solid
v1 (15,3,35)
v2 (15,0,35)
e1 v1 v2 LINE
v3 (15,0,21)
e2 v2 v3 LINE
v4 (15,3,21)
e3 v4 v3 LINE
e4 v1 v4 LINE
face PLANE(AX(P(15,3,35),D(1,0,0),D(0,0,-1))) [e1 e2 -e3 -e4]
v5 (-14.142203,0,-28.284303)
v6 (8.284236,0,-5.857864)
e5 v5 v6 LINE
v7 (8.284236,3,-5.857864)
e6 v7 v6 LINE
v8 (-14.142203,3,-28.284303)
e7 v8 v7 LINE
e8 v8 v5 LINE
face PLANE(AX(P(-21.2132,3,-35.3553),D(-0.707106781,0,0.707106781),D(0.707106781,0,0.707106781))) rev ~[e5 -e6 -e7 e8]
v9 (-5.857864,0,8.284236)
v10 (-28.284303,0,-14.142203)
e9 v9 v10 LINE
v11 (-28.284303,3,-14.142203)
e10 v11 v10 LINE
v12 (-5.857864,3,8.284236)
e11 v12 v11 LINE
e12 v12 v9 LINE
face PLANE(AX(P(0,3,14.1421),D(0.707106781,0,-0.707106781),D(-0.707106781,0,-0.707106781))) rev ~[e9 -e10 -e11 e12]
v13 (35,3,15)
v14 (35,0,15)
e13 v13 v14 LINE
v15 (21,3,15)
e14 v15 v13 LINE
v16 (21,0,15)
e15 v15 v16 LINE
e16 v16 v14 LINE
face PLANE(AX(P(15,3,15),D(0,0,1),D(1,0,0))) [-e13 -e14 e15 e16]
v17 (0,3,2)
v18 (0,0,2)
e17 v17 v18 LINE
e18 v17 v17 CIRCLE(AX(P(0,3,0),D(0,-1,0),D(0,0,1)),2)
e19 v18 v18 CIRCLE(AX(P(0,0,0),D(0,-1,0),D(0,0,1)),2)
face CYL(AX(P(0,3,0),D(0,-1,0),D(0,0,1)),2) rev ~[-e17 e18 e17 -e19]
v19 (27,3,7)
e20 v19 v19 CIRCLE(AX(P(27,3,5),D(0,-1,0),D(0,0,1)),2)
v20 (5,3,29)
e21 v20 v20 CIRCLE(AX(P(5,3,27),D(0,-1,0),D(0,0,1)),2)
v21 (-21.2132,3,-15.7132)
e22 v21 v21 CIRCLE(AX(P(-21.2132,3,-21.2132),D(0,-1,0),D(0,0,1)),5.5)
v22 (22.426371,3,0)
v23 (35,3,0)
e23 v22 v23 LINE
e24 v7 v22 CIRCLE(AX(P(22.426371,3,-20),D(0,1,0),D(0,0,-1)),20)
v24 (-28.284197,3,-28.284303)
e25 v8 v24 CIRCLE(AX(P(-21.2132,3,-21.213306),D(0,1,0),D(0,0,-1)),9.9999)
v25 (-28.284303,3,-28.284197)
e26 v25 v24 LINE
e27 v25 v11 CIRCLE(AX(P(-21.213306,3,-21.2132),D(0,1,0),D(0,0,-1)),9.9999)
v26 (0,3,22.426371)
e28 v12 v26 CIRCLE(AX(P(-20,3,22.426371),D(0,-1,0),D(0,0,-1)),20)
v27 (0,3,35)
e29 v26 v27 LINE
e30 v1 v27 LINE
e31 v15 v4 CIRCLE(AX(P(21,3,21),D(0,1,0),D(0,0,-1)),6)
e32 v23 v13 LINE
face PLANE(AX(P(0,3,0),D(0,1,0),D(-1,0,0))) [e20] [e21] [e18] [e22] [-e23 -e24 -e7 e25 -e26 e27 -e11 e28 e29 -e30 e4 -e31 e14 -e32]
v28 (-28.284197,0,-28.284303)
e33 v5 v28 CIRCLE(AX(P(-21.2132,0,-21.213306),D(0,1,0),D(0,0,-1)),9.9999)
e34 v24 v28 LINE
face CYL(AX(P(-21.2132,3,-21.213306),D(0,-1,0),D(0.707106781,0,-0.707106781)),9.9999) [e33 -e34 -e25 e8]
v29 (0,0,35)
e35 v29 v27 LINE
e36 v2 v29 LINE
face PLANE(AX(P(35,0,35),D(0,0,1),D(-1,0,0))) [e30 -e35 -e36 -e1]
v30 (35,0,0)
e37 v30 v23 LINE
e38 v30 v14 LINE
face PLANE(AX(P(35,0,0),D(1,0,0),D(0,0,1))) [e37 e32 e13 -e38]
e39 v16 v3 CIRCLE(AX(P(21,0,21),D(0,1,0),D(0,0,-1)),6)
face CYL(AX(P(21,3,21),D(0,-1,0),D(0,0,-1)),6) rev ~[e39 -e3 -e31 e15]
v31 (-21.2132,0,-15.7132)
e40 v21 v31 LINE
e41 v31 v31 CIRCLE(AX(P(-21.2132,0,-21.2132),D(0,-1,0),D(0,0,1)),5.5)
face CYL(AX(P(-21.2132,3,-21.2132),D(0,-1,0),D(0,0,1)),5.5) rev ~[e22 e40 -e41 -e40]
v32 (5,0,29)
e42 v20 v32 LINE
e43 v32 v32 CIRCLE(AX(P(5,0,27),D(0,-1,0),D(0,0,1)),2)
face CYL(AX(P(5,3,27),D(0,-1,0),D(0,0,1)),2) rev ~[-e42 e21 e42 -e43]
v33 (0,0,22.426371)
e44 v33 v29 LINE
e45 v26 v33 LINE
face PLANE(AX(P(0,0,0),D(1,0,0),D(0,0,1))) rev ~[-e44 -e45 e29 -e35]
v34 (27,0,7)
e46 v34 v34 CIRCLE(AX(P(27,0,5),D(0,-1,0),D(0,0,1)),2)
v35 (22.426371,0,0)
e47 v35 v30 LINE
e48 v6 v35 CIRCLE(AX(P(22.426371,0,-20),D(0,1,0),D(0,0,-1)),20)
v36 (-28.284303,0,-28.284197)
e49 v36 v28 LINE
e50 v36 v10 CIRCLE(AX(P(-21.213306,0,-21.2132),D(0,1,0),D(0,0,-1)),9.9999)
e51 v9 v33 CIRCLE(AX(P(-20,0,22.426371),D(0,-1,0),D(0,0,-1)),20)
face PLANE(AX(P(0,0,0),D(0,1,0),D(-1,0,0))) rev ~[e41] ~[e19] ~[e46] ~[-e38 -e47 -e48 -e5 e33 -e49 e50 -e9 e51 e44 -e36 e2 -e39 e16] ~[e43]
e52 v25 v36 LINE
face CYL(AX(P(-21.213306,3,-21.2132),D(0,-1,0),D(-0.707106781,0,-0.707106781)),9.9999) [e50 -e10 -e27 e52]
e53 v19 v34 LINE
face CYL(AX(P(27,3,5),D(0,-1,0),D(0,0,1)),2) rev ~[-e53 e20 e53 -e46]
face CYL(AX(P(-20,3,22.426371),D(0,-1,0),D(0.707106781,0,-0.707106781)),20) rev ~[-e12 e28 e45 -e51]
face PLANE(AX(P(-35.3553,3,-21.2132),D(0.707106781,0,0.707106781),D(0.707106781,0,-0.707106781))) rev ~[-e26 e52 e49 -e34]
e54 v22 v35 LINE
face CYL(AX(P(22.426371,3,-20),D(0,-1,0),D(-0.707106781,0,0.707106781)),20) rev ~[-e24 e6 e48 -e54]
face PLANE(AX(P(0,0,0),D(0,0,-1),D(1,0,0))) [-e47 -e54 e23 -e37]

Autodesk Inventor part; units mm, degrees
ref_plane "YZ Plane" through (0, 0, 0) normal (1, 0, 0) x (0, 1, 0)
ref_plane "XZ Plane" through (0, 0, 0) normal (0, 1, 0) x (-1, 0, 0)
ref_plane "XY Plane" through (0, 0, 0) normal (0, 0, 1) x (1, 0, 0)
sketch "Sketch23" plane through (0, 0, 0) normal (0, 1, 0) x (-1, 0, 0)
  line L0 (0, -7) -> (0, 42) projected
  line L1 (7, 0) -> (-42, 0) projected
  line L2 (0, 0) -> (-35, 0)
  line L3 (-35, 0) -> (-35, 35)
  line L4 (-35, 35) -> (0, 35)
  line L5 (0, 35) -> (0, 0)
  line L6 (0, 0) -> (-35, 35) construction
  point P0 (0, 0)
  dimension "d213" = 35
  dimension "d214" = 35
extrude "Extrusion14" add sketch "Sketch23" along normal blind 3
sketch "Sketch24" plane through (0, 3, 0) normal (0, 1, 0) x (1, 0, 0)
  line L0 (35, 0) -> (0, 0) projected
  line L1 (0, 0) -> (0, -35) projected
  line L2 (0, -35) -> (35, -35) projected
  line L3 (35, -35) -> (35, 0) projected
  line L4 (-41.7276, 41.7276) -> (35, -35) construction
  line L5 (-35.3553, 21.2132) -> (-21.2132, 35.3553)
  line L6 (-21.2132, 35.3553) -> (14.1421, 0)
  line L7 (35, 0) -> (0, 0) projected
  line L8 (0, -14.1421) -> (-35.3553, 21.2132)
  line L9 (-23.915, -23.915) -> (42.6519, 42.6519) construction
  dimension "d217" = 45
  dimension "d218" = 20
  dimension "d219" = 40
extrude "Extrusion15" add sketch "Sketch24" against normal blind 3 contours L0 L1 L8 L5 L6
sketch "Sketch36" plane through (0, 3, 0) normal (0, 1, 0) x (1, 0, 0)
  line L0 (-35.3553, 21.2132) -> (0, -14.1421) projected
  line L1 (14.1421, 0) -> (-21.2132, 35.3553) projected
  line L2 (-21.2132, 35.3553) -> (-35.3553, 21.2132) projected
  line L3 (-49.4264, 0) -> (49.0711, 0) projected
  line L4 (0, 49.4264) -> (0, -49.0711) projected
  line L5 (35, 0) -> (14.1421, 0) projected
  line L6 (0, -14.1421) -> (0, -35) projected
  line L7 (35, -35) -> (35, 0) projected
  line L8 (0, -35) -> (35, -35) projected
  line L9 (-30.4046, 30.4046) -> (24.5711, -24.5711) construction
  line L10 (14.1421, 0) -> (-21.2132, 35.3553) projected
  point P0 (0, 0)
  point P1 (0, -32)
  point P2 (32, 0)
  point P3 (-21.2132, 21.2132)
  dimension "d343" = 10
  dimension "d344" = 10
hole "Hole17" at (-21.2132, 3, -21.2132) direction (0, -1, 0) diameter 11 end through all
fillet "Fillet15" radius 10 2 edges at (-35.3553, 1.5, -21.2132) (-21.2132, 1.5, -35.3553)
fillet "Fillet18" radius 20 2 edges at (14.1421, 1.5, 0) (0, 1.5, 14.1421)
sketch "Sketch41" plane through (0, 3, 0) normal (0, 1, 0) x (1, 0, 0)
  line L0 (35, 0) -> (22.4264, 0) projected
  arc A0 (8.2843, 5.8579) -> (22.4264, 0) centre (22.4264, 20) ccw projected
  line L1 (8.2843, 5.8579) -> (-14.1421, 28.2843) projected
  arc A1 (-14.1421, 28.2843) -> (-28.2843, 14.1421) centre (-21.2132, 21.2132) ccw projected
  line L2 (-28.2843, 14.1421) -> (-5.8579, -8.2843) projected
  arc A2 (0, -22.4264) -> (-5.8579, -8.2843) centre (-20, -22.4264) ccw projected
  line L3 (0, -22.4264) -> (0, -35) projected
  line L4 (0, -35) -> (35, -35) projected
  line L5 (35, -35) -> (35, 0) projected
  circle A3 centre (-21.2132, 21.2132) radius 5.5 projected
  line L6 (-42.9041, 42.9041) -> (81.0287, -81.0287) construction
  line L7 (8.2843, 5.8579) -> (-14.1421, 28.2843) projected
  line L8 (1.4985, 43.9249) -> (-47.6457, -5.2193) construction
  point P0 (0, 0)
  point P1 (0, 0)
  dimension "d365" = 30
hole "Hole20" at (0, 3, 0) direction (0, -1, 0) diameter 4 end through all
sketch "Sketch42" plane through (0, 3, 0) normal (0, 1, 0) x (1, 0, 0)
  circle A0 centre (0, 0) radius 2 projected
  circle A1 centre (-21.2132, 21.2132) radius 5.5 projected
  arc A2 (-14.1421, 28.2843) -> (-28.2843, 14.1421) centre (-21.2132, 21.2132) ccw projected
  line L0 (-28.2843, 14.1421) -> (-5.8579, -8.2843) projected
  arc A3 (0, -22.4264) -> (-5.8579, -8.2843) centre (-20, -22.4264) ccw projected
  line L1 (0, -22.4264) -> (0, -35) projected
  line L2 (0, -35) -> (35, -35) projected
  line L3 (35, -35) -> (35, 0) projected
  line L4 (35, 0) -> (22.4264, 0) projected
  arc A4 (8.2843, 5.8579) -> (22.4264, 0) centre (22.4264, 20) ccw projected
  line L5 (8.2843, 5.8579) -> (-14.1421, 28.2843) projected
  line L6 (35, -35) -> (15, -35)
  line L7 (15, -35) -> (15, -15)
  line L8 (15, -15) -> (35, -15)
  line L9 (35, -15) -> (35, -35)
  line L10 (35, -35) -> (35, 0) projected
  line L11 (0, -35) -> (35, -35) projected
  point P0 (0, 0)
  dimension "d423" = 15
  dimension "d424" = 15
extrude "Extrusion20" cut sketch "Sketch42" against normal blind 3 contours L3 L2 L7 L8
sketch "Sketch46" plane through (0, 3, 0) normal (0, 1, 0) x (1, 0, 0)
  line L0 (35, 0) -> (22.4264, 0) projected
  line L1 (0, -22.4264) -> (0, -35) projected
  line L2 (35, -15) -> (35, 0) projected
  line L3 (0, -35) -> (15, -35) projected
  point P0 (0, 0)
  point P1 (27, -5)
  point P2 (5, -27)
  dimension "d403" = 5
  dimension "d405" = 5
  dimension "d425" = 8
  dimension "d426" = 8
hole "Hole23" at (27, 3, 5) at (5, 3, 27) direction (0, -1, 0) diameter 4 end through all
fillet "Fillet22" radius 6 1 edges at (15, 1.5, 15)
properties part number "quarter_upper"
